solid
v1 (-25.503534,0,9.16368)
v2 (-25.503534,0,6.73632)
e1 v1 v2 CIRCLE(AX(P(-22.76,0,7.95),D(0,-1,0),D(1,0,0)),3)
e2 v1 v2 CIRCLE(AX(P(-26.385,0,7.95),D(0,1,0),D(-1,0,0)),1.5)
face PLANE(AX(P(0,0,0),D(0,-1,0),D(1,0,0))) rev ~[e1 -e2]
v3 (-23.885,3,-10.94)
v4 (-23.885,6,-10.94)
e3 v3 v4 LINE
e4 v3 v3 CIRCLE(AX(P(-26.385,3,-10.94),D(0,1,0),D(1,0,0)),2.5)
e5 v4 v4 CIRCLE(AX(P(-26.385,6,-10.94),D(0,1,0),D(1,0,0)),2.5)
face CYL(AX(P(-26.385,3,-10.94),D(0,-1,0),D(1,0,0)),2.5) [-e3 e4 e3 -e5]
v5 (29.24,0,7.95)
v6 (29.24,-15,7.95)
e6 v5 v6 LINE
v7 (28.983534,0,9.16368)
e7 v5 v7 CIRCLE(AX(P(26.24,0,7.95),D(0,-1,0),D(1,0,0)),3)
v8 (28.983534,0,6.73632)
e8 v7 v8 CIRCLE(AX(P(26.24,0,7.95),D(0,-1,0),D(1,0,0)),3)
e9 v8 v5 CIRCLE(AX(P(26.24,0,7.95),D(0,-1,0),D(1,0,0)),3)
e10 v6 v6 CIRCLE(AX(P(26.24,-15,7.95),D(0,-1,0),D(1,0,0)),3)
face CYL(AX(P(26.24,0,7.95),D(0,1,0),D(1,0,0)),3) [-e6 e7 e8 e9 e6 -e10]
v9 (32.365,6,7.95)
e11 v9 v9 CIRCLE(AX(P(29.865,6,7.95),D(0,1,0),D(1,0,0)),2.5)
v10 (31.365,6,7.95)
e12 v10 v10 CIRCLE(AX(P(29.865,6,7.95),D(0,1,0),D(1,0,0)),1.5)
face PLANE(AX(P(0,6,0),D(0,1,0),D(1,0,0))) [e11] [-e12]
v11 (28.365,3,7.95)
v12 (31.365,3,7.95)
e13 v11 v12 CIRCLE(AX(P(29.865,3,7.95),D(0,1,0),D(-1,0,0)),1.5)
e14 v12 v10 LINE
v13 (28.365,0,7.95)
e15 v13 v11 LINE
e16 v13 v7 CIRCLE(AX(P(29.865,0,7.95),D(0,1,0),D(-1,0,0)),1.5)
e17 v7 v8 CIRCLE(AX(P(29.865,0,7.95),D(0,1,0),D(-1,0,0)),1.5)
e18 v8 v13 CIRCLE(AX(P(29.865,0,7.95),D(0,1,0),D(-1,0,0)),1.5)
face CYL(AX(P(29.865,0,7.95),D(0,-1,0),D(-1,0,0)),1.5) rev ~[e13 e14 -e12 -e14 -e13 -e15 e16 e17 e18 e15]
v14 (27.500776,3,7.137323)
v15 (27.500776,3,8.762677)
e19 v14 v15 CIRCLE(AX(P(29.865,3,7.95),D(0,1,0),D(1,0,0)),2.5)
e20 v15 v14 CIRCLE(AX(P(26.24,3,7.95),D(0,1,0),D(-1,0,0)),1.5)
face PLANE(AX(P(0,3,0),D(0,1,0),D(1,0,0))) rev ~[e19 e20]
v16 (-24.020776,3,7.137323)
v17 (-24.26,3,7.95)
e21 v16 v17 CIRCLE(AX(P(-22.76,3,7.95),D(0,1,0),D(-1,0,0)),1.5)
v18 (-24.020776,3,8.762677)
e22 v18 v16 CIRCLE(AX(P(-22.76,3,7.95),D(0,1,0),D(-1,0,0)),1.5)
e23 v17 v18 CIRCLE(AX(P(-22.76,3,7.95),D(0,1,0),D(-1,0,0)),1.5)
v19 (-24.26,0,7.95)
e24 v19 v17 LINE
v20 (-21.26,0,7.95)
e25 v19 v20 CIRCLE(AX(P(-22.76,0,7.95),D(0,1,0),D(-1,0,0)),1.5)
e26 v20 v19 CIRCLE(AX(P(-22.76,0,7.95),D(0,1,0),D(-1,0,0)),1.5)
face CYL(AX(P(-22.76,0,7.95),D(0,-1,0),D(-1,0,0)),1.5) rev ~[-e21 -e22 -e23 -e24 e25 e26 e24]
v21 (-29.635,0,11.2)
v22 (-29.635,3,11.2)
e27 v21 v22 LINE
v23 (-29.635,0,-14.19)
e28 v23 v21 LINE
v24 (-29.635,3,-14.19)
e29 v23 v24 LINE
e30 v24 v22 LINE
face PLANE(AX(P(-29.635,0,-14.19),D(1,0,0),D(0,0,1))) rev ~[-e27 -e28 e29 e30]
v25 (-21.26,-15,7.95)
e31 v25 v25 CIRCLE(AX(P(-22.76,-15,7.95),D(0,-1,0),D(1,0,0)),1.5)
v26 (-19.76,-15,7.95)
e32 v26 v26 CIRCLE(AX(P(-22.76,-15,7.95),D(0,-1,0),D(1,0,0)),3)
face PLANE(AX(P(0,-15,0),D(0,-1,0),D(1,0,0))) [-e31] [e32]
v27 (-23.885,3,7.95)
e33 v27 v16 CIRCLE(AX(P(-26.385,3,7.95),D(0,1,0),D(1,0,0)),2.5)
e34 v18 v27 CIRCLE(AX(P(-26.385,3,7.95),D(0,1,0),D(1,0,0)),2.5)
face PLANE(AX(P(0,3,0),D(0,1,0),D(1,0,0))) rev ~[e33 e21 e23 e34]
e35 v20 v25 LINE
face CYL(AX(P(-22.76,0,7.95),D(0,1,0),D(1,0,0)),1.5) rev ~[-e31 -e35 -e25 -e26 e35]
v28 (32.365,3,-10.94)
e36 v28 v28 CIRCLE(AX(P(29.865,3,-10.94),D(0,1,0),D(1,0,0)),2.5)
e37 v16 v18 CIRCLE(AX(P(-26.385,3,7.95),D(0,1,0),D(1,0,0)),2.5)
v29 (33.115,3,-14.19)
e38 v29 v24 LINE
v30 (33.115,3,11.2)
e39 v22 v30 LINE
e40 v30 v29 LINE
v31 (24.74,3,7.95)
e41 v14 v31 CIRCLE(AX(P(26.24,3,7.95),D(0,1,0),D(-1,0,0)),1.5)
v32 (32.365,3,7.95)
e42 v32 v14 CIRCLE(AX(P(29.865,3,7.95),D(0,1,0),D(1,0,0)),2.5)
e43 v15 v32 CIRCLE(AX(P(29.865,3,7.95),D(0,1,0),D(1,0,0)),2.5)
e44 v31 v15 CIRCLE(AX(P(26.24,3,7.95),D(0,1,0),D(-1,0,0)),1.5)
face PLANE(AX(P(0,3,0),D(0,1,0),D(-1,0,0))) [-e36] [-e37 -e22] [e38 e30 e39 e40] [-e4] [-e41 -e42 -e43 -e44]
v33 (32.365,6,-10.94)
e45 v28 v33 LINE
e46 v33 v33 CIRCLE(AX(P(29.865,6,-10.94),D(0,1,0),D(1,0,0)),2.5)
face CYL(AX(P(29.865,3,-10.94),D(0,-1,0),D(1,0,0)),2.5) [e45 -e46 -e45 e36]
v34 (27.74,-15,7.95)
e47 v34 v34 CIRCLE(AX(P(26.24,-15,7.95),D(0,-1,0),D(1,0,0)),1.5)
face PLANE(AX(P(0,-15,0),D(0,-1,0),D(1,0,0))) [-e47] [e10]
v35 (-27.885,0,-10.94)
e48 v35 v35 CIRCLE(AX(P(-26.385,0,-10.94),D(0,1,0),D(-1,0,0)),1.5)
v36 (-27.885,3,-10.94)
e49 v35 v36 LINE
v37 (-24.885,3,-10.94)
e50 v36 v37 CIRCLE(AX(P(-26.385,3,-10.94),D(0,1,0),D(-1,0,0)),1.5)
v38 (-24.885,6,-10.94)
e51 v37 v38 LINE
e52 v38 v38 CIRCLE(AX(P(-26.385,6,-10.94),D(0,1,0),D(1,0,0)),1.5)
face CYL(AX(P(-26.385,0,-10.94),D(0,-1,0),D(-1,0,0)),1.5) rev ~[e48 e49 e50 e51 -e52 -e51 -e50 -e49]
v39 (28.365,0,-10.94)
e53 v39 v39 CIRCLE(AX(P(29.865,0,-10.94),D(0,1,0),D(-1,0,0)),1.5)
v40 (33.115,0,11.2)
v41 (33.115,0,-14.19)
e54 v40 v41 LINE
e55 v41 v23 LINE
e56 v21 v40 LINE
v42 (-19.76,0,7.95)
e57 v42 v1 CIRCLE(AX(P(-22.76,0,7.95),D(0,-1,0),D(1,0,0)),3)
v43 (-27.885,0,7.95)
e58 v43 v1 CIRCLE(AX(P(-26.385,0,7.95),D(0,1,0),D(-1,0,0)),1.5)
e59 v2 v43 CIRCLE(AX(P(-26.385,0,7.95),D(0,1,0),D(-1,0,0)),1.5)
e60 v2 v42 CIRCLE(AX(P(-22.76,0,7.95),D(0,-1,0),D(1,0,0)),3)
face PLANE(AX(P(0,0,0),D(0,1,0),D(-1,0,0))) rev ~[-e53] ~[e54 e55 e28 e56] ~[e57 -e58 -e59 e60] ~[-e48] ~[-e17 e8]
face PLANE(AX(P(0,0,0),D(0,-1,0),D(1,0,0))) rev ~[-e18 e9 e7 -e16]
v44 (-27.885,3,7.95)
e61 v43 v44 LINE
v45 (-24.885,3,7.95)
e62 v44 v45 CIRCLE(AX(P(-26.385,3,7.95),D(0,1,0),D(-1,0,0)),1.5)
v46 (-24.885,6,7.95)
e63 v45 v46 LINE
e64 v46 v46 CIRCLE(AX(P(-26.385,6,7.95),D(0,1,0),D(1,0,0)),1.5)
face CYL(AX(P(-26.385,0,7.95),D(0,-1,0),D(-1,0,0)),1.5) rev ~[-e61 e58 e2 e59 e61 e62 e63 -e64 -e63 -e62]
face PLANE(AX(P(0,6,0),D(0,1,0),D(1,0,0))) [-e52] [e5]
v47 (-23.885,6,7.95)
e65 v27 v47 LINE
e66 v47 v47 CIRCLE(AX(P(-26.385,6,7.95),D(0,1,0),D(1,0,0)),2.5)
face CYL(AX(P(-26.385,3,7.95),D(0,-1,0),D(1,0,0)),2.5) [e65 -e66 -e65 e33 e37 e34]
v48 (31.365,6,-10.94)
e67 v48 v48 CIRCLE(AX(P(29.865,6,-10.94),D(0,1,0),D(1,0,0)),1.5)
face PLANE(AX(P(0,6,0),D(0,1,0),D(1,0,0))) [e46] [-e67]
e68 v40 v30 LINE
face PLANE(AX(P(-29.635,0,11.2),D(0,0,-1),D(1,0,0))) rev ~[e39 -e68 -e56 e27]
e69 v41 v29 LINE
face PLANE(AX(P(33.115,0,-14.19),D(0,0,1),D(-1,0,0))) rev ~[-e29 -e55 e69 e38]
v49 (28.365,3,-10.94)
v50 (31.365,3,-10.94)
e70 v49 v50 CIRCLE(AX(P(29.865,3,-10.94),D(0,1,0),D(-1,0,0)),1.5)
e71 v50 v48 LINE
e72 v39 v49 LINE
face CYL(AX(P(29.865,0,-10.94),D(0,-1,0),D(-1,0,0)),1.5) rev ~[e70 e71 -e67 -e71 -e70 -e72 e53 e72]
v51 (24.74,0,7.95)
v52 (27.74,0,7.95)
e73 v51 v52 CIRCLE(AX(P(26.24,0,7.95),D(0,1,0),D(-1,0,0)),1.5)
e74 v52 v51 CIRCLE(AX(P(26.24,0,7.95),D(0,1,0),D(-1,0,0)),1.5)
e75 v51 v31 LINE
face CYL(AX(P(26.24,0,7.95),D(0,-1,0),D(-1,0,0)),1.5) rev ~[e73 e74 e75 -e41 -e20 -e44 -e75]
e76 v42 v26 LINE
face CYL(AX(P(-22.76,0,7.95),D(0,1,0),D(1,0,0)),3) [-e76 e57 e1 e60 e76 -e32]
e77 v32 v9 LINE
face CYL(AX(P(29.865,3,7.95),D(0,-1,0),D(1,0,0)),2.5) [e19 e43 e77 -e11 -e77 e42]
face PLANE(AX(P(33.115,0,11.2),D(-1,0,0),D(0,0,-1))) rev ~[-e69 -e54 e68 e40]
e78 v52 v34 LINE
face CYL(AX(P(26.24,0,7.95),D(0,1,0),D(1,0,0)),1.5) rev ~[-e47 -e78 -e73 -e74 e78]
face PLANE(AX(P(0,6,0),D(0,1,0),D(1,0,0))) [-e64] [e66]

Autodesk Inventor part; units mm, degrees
ref_plane "YZ Plane" through (0, 0, 0) normal (1, 0, 0) x (0, 1, 0)
ref_plane "XZ Plane" through (0, 0, 0) normal (0, 1, 0) x (-1, 0, 0)
ref_plane "XY Plane" through (0, 0, 0) normal (0, 0, 1) x (1, 0, 0)
sketch "Boceto1" plane through (0, 0, 0) normal (0, 1, 0) x (-1, 0, 0)
  circle A0 centre (22.76, 7.95) radius 1.5
  circle A1 centre (-26.24, 7.95) radius 1.5
  line L0 (29.635, -14.19) -> (29.635, 11.2)
  line L1 (29.635, 11.2) -> (-33.115, 11.2)
  line L2 (-33.115, 11.2) -> (-33.115, -14.19)
  line L3 (-33.115, -14.19) -> (29.635, -14.19)
  line L4 (-1.74, -3.0983) -> (-1.74, -1.495)
  line L5 (-1.74, -1.495) -> (-3.5727, -1.495)
  circle A2 centre (26.385, -10.94) radius 1.5
  circle A3 centre (-29.865, -10.94) radius 1.5
  circle A4 centre (26.385, 7.95) radius 1.5
  circle A5 centre (-29.865, 7.95) radius 1.5
  dimension "d5" = 25.39
  dimension "d6" = 62.75
  dimension "d7" = 3
  dimension "d8" = 3.25
  dimension "d9" = 3.25
  dimension "d10" = 49
  dimension "d11" = 0
  dimension "d24" = 3
extrude "Extrusión1" add sketch "Boceto1" along normal blind 3
sketch "Boceto2" plane through (0, 3, 0) normal (0, 1, 0) x (1, 0, 0)
  circle A0 centre (-26.385, -7.95) radius 1.5 projected
  circle A1 centre (-26.385, -7.95) radius 2.5
  circle A2 centre (-26.385, 10.94) radius 1.5 projected
  circle A3 centre (-26.385, 10.94) radius 2.5
  circle A4 centre (29.865, 10.94) radius 1.5 projected
  circle A5 centre (29.865, 10.94) radius 2.5
  circle A6 centre (29.865, -7.95) radius 1.5 projected
  circle A7 centre (29.865, -7.95) radius 2.5
  point P0 (0, 0)
  dimension "d14" = 5
  dimension "d15" = 5
  dimension "d16" = 5
  dimension "d17" = 5
extrude "Extrusión2" add sketch "Boceto2" along normal blind 3
sketch "Boceto3" plane through (0, 0, 0) normal (0, -1, 0) x (1, 0, 0)
  circle A0 centre (-22.76, 7.95) radius 1.5 projected
  circle A1 centre (-22.76, 7.95) radius 3
  circle A2 centre (26.24, 7.95) radius 1.5 projected
  circle A3 centre (26.24, 7.95) radius 3
  point P0 (0, 0)
  dimension "d20" = 6
  dimension "d21" = 6
extrude "Extrusión3" add sketch "Boceto3" along normal blind 15
properties part number "Soporte 16 pwm"
